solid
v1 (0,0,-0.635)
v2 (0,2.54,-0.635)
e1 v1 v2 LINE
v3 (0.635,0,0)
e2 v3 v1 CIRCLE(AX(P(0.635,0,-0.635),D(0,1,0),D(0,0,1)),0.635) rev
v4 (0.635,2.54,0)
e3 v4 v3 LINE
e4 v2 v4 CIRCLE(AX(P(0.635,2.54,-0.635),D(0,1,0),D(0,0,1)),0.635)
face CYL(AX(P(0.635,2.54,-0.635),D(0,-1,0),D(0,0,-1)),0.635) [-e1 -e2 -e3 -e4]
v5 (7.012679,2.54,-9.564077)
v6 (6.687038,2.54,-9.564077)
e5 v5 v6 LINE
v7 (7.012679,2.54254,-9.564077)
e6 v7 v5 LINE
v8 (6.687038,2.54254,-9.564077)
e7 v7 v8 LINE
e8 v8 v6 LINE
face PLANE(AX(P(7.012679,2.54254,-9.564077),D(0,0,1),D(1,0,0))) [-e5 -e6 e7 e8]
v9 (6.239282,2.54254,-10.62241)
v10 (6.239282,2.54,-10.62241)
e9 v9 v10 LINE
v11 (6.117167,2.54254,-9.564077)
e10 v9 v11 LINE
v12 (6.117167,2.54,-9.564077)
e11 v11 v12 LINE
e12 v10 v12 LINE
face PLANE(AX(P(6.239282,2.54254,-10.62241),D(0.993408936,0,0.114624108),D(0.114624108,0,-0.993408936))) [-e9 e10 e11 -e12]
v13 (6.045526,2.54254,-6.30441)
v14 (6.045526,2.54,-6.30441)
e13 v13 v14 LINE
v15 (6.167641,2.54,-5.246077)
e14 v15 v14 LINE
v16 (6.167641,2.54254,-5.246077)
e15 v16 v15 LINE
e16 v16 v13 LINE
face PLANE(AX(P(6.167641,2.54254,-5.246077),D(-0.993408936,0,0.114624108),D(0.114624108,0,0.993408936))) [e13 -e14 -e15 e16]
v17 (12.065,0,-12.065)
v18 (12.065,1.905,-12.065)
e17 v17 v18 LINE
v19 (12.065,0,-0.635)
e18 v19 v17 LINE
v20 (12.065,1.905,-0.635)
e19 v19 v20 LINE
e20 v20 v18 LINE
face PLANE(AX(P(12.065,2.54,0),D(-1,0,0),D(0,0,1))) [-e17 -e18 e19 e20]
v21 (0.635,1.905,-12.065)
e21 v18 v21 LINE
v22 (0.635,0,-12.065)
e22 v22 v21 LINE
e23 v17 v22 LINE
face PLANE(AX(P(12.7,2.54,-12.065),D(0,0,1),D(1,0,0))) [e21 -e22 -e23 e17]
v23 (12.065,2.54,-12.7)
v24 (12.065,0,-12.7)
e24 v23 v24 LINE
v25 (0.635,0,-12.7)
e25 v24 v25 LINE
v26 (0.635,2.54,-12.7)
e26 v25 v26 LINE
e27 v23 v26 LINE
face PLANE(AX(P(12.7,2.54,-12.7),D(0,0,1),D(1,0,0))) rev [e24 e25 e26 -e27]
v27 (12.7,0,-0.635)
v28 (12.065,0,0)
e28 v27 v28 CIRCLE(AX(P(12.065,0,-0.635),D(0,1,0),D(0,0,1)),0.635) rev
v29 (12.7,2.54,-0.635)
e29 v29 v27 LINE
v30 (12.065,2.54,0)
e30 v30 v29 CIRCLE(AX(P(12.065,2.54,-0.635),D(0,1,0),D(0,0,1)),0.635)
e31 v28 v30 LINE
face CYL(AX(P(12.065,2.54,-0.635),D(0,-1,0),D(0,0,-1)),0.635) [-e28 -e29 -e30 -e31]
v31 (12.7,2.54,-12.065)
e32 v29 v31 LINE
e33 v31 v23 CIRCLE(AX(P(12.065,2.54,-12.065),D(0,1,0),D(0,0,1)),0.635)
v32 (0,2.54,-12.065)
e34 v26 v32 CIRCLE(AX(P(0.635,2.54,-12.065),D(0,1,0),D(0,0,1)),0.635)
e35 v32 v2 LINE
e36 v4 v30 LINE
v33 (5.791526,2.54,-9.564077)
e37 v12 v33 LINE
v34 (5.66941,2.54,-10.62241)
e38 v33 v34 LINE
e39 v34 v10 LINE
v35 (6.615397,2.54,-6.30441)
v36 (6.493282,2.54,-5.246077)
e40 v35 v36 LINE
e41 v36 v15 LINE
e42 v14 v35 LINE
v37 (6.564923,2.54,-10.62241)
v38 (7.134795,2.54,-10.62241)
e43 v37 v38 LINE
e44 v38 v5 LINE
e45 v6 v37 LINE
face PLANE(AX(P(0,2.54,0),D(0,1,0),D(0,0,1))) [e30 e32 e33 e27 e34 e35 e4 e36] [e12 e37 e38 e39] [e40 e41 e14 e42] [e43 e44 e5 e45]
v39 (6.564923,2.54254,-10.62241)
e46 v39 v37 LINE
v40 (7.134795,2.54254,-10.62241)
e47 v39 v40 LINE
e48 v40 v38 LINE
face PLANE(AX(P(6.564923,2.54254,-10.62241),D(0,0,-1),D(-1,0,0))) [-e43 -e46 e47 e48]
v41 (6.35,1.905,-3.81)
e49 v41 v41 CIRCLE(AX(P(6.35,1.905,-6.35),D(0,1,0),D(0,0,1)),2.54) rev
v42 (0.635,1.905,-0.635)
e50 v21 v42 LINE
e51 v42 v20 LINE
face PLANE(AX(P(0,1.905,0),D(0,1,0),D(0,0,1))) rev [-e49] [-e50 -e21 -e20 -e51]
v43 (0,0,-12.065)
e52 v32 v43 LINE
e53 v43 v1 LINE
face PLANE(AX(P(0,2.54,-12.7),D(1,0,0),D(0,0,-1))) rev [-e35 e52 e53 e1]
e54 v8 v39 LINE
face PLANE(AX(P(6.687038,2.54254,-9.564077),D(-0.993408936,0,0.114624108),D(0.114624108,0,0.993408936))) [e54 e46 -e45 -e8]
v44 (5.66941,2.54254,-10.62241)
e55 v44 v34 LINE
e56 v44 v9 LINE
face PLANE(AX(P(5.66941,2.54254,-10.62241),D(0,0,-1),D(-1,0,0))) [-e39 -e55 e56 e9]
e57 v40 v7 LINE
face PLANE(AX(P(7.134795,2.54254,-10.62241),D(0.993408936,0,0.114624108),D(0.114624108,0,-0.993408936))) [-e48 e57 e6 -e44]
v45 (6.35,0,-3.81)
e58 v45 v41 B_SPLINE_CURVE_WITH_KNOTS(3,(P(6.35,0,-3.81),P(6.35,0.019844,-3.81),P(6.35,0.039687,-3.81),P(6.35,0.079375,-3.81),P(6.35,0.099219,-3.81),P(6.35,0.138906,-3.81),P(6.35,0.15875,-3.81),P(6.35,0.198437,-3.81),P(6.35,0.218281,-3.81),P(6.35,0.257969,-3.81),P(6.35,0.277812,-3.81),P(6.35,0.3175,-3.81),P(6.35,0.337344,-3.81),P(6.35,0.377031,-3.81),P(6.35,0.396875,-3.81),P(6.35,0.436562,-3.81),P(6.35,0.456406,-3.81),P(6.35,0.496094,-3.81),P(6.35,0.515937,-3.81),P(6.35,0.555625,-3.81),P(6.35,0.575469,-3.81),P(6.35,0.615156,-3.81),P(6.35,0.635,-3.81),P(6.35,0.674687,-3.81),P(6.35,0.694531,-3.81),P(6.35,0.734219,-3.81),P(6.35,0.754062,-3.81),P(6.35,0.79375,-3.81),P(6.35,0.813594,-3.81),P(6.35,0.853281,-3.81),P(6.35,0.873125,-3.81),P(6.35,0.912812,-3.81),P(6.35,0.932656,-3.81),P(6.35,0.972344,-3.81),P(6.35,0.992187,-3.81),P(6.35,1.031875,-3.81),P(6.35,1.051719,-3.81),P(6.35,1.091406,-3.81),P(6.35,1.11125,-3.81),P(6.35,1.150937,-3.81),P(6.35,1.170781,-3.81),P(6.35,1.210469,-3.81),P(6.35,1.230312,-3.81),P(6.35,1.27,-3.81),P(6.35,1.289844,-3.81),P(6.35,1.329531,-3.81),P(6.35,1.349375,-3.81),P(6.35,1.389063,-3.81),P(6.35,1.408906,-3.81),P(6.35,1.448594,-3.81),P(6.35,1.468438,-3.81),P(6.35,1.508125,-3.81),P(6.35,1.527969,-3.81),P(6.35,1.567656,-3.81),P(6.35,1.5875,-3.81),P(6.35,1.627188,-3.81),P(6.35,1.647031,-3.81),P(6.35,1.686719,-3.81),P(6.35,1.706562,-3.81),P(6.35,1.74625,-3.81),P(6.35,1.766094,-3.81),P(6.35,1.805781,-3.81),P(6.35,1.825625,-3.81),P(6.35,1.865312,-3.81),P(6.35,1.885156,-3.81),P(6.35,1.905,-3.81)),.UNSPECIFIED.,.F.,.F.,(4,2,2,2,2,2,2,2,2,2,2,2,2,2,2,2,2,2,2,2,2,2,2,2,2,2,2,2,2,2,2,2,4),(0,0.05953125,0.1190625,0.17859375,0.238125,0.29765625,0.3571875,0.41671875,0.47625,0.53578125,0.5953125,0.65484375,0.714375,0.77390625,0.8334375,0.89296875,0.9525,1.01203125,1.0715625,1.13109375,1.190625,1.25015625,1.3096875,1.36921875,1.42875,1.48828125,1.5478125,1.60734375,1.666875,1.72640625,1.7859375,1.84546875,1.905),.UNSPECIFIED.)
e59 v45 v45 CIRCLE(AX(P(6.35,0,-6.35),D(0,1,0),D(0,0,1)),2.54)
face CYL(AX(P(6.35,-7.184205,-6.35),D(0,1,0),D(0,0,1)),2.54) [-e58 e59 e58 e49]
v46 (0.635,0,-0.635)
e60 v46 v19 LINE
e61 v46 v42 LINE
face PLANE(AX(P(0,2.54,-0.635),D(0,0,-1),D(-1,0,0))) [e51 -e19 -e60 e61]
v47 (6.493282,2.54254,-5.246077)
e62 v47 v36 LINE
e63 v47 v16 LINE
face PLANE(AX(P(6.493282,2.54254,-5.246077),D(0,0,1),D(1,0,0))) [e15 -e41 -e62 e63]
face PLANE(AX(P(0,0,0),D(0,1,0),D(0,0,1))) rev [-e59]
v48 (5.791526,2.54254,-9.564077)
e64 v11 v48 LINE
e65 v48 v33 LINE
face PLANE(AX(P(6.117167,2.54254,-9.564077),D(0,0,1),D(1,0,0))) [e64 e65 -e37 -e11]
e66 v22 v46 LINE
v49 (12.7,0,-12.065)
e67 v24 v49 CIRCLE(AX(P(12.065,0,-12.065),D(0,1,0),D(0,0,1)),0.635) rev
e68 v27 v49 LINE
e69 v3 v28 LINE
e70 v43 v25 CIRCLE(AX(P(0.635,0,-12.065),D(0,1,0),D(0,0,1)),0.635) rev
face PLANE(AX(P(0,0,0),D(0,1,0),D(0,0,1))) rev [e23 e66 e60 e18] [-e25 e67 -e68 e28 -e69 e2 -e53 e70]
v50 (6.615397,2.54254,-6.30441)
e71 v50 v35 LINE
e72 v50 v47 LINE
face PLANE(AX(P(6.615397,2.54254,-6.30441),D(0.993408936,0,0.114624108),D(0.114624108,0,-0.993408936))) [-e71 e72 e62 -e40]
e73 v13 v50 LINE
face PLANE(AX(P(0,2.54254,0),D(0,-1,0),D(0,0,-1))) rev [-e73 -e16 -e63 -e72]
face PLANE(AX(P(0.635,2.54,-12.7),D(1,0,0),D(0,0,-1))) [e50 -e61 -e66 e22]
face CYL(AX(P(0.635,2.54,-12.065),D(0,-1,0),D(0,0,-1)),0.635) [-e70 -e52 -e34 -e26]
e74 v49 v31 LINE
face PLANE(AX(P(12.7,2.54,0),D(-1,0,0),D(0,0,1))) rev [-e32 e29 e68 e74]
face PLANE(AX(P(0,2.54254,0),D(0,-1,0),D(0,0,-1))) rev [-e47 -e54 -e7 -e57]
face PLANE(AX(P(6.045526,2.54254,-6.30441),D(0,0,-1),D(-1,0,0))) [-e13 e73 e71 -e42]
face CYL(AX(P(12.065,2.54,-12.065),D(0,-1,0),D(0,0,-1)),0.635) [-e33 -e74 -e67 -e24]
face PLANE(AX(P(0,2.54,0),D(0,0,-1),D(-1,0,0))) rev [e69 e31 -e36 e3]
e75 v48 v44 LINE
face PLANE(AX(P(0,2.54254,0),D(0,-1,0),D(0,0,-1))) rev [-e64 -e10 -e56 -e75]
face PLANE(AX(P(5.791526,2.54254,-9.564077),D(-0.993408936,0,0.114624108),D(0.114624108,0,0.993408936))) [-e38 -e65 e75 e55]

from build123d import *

# Parameters (mm, degrees)
SKETCH1_W           = 12.7
SKETCH1_H           = 12.7
BOSS_EXTRUDE1_DEPTH = 2.54
FILLET1_R           = 0.635
SHELL1_START        = 0.635
SHELL1_OUTLINE_W    = 1.905
SHELL1_OUTLINE_H    = 11.43
SHELL1_DEPTH        = 11.43
SKETCH2_R           = 2.54
BOSS_EXTRUDE2_DEPTH = 1.905
BOSS_EXTRUDE3_DEPTH = 0.00254


# Read off the part's stored shape, not the designer's step: Shell1
with BuildPart() as part:
    # Sketch1 → Boss-Extrude1 (new body)
    with BuildSketch(Plane(origin=(0, 0, 0), x_dir=(1, 0, 0), z_dir=(0, 1, 0))):
        with Locations((6.35, 6.35)):
            Rectangle(SKETCH1_W, SKETCH1_H)
    extrude(amount=BOSS_EXTRUDE1_DEPTH)

    # Fillet1
    fillet1_edges = [part.edges().sort_by_distance(p)[0] for p in [
        (0, 1.27, -12.7),
        (12.7, 1.27, -12.7),
        (12.7, 1.27, 0),
        (0, 1.27, 0),
    ]]
    fillet(fillet1_edges, radius=FILLET1_R)

    # Shell1 outline → Shell1 (cut)
    with BuildSketch(Plane.YZ.offset(SHELL1_START)):
        with Locations((0.9525, -6.35)):
            Rectangle(SHELL1_OUTLINE_W, SHELL1_OUTLINE_H)
    extrude(amount=SHELL1_DEPTH, mode=Mode.SUBTRACT)

    # Sketch2 → Boss-Extrude2 (add)
    with BuildSketch(Plane(origin=(0, 1.905, 0), x_dir=(-1, 0, 0), z_dir=(0, -1, 0))):
        with Locations(Location((-6.35, 6.35, 0), (0, 0, 270))):
            Circle(SKETCH2_R)
    extrude(amount=BOSS_EXTRUDE2_DEPTH)

    # Sketch3 → Boss-Extrude3 (add)
    with BuildSketch(Plane(origin=(0, 2.54, 0), x_dir=(1, 0, 0), z_dir=(0, 1, 0))):
        Polygon((7.012679487, 9.564076923), (6.687038462, 9.564076923), (6.564923077, 10.622410256), (7.134794872, 10.622410256), align=None)
        Polygon((6.117166667, 9.564076923), (5.791525641, 9.564076923), (5.669410256, 10.622410256), (6.239282051, 10.622410256), align=None)
        Polygon((6.493282051, 5.246076923), (6.167641026, 5.246076923), (6.045525641, 6.304410256), (6.615397436, 6.304410256), align=None)
    extrude(amount=BOSS_EXTRUDE3_DEPTH)


solid = part.part
